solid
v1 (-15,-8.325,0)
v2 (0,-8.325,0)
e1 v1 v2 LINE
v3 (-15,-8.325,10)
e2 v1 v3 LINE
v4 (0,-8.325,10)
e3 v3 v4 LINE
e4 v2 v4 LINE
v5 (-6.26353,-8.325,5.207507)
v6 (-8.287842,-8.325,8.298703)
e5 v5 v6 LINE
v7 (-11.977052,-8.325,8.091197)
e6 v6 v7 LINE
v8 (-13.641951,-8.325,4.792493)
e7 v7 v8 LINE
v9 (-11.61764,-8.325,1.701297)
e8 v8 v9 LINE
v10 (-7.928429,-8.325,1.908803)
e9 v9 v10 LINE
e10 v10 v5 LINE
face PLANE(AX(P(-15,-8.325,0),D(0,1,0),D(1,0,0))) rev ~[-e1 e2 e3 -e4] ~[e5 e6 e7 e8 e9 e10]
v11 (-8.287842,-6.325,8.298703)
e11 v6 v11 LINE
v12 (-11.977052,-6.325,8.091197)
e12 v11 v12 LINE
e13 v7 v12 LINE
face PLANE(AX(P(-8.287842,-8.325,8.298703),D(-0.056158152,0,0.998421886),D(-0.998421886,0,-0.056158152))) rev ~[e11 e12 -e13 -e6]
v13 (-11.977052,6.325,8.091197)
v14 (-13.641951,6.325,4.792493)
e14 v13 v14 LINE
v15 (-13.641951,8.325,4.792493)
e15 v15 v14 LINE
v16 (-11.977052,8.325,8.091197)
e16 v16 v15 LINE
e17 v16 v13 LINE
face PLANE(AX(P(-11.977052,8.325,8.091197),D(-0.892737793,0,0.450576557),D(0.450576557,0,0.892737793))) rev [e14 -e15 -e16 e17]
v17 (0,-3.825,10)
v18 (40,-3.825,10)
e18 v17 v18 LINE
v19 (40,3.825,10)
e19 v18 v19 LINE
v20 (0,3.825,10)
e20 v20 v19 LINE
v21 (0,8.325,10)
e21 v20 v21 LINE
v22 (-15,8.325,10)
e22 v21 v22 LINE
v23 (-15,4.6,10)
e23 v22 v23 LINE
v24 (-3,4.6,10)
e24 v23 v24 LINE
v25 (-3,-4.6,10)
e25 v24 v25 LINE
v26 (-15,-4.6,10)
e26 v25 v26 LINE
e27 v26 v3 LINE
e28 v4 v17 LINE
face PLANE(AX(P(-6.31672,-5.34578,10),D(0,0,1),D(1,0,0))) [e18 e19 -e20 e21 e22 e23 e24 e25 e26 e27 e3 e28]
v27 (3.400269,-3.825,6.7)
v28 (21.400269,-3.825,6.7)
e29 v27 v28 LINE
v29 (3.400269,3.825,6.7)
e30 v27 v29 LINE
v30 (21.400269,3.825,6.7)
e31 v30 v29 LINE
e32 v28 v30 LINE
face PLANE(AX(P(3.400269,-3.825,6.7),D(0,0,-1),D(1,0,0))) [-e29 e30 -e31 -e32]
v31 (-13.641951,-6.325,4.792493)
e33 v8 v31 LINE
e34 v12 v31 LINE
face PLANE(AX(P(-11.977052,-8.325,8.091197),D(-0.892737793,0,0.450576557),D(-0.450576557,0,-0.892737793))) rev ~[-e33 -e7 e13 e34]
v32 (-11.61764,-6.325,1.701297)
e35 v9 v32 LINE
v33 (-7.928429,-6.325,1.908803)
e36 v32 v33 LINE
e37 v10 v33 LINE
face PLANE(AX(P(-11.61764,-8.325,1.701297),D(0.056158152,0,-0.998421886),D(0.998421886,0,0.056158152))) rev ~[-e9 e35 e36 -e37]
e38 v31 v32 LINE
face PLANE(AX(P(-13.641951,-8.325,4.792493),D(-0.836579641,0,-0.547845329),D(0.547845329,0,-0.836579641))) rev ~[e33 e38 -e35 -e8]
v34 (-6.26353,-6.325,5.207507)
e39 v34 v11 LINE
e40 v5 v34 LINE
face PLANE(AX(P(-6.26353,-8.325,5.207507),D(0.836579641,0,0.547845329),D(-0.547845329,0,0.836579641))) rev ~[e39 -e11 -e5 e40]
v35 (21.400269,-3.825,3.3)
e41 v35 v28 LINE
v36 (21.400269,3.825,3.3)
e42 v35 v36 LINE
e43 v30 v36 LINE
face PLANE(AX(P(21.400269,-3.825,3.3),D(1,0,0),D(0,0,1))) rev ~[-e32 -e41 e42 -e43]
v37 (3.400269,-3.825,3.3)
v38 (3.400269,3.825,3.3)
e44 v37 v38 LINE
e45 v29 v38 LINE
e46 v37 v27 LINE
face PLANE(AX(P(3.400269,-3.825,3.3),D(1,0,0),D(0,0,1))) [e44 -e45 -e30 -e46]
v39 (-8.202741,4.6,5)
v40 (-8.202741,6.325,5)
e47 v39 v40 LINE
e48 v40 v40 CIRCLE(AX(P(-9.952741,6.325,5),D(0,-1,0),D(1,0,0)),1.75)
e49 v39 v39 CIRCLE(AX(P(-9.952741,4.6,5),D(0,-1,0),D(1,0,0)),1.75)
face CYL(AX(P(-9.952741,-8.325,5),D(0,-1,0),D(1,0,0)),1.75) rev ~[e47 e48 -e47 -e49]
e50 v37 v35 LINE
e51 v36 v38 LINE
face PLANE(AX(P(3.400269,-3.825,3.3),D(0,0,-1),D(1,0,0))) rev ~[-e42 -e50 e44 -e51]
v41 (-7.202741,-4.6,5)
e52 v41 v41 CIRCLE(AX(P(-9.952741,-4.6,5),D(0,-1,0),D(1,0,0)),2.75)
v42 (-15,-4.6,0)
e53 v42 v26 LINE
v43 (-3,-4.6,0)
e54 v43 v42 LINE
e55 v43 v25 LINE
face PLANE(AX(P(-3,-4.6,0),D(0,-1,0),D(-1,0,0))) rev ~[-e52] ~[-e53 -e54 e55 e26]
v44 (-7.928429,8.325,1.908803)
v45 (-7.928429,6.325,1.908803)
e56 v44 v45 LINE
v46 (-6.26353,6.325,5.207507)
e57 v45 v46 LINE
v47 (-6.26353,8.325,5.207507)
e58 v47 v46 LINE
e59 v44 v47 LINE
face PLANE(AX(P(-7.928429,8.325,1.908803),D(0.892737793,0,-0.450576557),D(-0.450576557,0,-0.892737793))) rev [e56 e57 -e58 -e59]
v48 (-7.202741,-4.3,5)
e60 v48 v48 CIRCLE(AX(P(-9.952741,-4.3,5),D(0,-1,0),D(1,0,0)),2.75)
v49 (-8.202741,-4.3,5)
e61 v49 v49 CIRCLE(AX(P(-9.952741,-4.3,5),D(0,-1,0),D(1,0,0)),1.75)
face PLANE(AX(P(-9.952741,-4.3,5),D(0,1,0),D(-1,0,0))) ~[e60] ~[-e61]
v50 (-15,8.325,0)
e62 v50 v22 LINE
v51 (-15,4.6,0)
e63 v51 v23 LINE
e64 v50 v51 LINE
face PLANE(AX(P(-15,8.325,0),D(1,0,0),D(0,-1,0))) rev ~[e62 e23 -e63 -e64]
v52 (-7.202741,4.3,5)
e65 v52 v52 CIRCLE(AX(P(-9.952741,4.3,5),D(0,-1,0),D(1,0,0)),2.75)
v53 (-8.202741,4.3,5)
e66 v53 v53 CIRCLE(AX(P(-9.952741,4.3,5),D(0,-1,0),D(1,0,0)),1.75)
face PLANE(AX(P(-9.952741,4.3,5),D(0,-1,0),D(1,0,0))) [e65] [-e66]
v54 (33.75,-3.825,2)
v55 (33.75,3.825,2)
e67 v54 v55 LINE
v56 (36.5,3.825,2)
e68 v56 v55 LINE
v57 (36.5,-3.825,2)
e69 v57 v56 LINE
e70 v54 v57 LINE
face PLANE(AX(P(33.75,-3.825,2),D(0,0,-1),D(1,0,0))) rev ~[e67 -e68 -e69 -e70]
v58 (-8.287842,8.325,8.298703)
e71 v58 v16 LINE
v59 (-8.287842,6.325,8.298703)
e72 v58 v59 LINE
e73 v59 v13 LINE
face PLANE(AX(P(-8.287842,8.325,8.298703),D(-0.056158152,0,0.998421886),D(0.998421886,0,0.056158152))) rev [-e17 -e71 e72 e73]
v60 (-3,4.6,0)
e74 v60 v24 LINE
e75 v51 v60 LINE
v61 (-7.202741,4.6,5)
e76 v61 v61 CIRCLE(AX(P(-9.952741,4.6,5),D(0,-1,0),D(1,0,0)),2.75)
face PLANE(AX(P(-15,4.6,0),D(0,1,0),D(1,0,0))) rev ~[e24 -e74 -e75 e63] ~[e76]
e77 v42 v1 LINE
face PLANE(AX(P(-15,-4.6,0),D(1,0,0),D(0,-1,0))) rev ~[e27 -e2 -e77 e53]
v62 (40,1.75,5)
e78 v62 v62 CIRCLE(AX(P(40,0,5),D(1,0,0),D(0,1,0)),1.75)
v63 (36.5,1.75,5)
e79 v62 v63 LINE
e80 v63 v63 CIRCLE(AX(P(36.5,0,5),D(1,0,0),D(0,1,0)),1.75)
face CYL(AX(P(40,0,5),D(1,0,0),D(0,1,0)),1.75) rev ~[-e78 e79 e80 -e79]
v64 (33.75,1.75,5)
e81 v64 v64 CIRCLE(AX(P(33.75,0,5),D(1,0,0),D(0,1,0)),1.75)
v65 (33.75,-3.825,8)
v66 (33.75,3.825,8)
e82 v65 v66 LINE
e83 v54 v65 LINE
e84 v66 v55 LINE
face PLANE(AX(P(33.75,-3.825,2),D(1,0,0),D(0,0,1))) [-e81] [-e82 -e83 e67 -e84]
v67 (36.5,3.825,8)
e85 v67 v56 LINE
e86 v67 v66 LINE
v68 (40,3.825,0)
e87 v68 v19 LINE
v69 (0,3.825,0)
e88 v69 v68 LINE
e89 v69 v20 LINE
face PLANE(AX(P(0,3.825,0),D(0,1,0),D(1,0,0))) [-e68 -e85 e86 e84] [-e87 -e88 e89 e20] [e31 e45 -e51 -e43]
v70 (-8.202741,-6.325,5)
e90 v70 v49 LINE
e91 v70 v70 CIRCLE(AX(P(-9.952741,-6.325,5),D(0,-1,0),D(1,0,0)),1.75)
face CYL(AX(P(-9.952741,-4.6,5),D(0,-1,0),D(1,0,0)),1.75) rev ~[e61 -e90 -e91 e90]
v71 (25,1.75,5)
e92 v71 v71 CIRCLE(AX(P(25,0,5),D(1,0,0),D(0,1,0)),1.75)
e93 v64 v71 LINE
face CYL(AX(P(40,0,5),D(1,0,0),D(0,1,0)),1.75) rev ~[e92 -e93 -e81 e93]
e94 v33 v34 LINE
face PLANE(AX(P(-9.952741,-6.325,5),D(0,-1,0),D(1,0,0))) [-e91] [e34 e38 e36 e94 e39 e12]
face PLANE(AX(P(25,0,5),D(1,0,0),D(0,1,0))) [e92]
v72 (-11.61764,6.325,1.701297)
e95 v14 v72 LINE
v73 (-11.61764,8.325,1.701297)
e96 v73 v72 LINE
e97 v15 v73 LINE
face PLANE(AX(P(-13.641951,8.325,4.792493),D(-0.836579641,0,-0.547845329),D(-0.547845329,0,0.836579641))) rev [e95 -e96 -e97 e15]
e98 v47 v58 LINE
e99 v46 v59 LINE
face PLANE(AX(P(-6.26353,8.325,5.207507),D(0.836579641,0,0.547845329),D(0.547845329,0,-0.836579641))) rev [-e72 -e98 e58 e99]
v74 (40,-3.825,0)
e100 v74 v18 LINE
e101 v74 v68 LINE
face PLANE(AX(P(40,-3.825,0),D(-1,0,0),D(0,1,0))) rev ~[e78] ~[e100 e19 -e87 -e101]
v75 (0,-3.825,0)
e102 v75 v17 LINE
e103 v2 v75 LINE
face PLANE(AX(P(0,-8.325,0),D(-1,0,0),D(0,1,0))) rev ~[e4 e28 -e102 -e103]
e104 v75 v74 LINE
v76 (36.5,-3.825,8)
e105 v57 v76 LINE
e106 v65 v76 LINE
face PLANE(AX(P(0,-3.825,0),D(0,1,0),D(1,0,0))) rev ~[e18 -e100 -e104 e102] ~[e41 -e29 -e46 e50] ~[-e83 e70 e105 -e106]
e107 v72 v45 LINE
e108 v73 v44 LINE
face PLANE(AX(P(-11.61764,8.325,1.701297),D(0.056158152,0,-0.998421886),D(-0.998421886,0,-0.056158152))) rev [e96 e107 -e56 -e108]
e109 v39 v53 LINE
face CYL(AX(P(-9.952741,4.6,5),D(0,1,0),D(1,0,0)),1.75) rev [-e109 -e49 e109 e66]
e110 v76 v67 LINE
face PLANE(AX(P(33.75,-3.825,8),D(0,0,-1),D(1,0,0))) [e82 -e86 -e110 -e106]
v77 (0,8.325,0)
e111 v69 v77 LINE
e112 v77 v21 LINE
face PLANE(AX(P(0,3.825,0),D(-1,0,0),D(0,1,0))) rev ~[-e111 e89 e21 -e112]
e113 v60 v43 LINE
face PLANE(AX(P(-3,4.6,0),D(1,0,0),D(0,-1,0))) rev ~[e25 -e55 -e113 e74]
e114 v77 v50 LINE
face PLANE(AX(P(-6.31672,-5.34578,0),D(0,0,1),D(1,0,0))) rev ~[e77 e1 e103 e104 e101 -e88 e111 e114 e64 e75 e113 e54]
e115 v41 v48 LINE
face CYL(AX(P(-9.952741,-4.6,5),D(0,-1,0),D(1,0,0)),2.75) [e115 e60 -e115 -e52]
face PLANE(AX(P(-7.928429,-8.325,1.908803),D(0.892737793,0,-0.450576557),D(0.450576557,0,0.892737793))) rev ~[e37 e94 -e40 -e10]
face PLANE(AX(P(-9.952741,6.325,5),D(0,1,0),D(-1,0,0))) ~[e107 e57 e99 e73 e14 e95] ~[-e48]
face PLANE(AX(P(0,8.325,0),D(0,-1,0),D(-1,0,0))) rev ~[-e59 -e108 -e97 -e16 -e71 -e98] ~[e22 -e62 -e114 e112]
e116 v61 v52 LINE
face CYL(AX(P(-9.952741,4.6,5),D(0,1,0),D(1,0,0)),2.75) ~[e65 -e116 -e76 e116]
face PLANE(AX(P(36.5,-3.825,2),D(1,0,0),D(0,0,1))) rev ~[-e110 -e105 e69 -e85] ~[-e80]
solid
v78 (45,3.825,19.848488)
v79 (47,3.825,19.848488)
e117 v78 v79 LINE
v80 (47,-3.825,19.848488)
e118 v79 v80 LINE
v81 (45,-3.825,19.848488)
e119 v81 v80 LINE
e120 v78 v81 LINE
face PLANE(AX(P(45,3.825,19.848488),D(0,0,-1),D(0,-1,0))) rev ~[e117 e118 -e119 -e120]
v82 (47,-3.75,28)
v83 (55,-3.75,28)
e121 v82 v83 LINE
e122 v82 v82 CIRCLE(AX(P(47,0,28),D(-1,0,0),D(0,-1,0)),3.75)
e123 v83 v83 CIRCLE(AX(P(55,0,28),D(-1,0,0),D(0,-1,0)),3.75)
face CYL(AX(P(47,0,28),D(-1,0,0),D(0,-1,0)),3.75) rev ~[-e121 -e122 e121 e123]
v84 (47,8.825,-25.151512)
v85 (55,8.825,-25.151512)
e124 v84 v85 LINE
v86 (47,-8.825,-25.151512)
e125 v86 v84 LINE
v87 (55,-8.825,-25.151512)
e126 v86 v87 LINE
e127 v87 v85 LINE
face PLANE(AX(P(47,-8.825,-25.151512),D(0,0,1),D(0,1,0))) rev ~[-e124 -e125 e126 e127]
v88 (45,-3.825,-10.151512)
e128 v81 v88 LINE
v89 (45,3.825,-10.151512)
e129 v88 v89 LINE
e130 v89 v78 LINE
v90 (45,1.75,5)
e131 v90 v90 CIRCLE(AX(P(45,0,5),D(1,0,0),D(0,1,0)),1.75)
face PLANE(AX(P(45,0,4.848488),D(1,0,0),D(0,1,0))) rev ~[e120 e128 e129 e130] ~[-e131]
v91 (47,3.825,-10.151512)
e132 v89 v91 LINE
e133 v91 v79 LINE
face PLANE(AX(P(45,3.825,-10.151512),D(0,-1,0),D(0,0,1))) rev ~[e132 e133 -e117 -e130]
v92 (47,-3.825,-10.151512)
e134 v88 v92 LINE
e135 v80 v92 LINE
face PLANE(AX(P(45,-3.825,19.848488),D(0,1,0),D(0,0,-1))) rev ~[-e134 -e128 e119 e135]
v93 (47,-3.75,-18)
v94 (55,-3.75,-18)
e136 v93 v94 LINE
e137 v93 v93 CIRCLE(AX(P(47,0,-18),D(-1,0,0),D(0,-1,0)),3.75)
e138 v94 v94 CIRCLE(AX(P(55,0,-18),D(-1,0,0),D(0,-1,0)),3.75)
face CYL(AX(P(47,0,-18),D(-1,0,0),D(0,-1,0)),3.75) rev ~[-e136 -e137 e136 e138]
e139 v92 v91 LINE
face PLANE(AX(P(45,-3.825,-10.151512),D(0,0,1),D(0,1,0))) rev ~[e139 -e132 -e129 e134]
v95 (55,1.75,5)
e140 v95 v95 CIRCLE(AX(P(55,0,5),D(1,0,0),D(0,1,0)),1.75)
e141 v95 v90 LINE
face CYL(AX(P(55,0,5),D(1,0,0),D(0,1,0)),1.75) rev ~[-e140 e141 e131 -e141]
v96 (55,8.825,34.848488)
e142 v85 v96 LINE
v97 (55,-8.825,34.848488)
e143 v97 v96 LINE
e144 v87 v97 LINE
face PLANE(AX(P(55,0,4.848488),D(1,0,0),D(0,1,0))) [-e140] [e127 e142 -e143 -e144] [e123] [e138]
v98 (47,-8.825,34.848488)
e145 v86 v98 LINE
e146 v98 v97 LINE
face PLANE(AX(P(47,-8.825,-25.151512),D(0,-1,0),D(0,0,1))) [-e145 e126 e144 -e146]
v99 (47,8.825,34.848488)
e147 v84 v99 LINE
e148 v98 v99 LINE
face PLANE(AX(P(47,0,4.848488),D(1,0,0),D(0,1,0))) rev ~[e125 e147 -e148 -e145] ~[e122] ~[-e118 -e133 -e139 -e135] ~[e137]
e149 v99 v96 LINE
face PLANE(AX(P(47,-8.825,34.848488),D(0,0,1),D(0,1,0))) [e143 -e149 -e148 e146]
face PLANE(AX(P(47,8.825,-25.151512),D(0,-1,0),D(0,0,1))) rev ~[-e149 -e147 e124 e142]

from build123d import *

# Parameters (mm, degrees)
F0_W      = 40
F0_H      = 3.825
F1_DEPTH  = 10
F2_R      = 1.75
F3_DEPTH  = 16.651
F4_W      = 18
F4_H      = 3.4
F4_W_2    = 2.75
F4_H_2    = 6
F5_DEPTH  = 12.151
F6_R      = 1.75
F7_DEPTH  = 15
F10_DEPTH = 2
F11_W     = 17.65
F11_H     = 60
F12_DEPTH = 8
F13_R     = 1.75
F14_DEPTH = 70.001
F15_R     = 2.75
F15_R_2   = 1.75
F16_DEPTH = 0.3
F17_R     = 1.75
F18_DEPTH = 2
F19_R     = 3.75
F20_DEPTH = 15


# Not quite as in the source:
# - a pattern or mirror of a feature is missing from the dataset's text; its kind, count and spacing are read off the source's solid


with BuildPart() as f1:
    # F0 (on Top) → F1 (new body)
    with BuildSketch(Plane.XY):
        Polygon((0, -3.825), (0, 0), (-3, 0), (-3, -4.6), (-15, -4.6), (-15, -8.325), (0, -8.325), align=None)
        Polygon((-3, 0), (0, 0), (0, 3.825), (0, 8.325), (-15, 8.325), (-15, 4.6), (-3, 4.6), align=None)
        with Locations((20, 1.9125)):
            Rectangle(F0_W, F0_H)
        with Locations((20, -1.9125)):
            Rectangle(F0_W, F0_H)
    extrude(amount=F1_DEPTH)

    # F2 (on face) → F3 (cut, through all)
    with BuildSketch(Plane.XZ.offset(8.325)):
        with Locations((-9.9527407438, 5)):
            Circle(F2_R)
    extrude(amount=-F3_DEPTH, mode=Mode.SUBTRACT)

    # F4 (on face) → F5 (cut, through all)
    with BuildSketch(Plane.XZ.offset(3.825)):
        with Locations((12.4002694301, 5)):
            Rectangle(F4_W, F4_H)
        with Locations((35.125, 5)):
            Rectangle(F4_W_2, F4_H_2)
    extrude(amount=-F5_DEPTH, mode=Mode.SUBTRACT)

    # F6 (on face) → F7 (cut)
    with BuildSketch(Plane.YZ.offset(40)):
        with Locations((0, 5)):
            Circle(F6_R)
    extrude(amount=-F7_DEPTH, mode=Mode.SUBTRACT)

    # F15 (on face) → F16 (join)
    with BuildSketch(Plane.XZ.offset(-4.6)):
        with Locations((-9.9527407438, 5)):
            Circle(F15_R)
        with Locations((-9.9527407438, 5)):
            Circle(F15_R_2, mode=Mode.SUBTRACT)
    f16 = extrude(amount=F16_DEPTH)

    # F16_copies: F16 across plane
    add(f16.mirror(Plane(origin=(0, 0, 0), x_dir=(0, 0, -1), z_dir=(0, -1, 0))))

    # F17 (on face) → F18 (cut)
    with BuildSketch(Plane.XZ.offset(8.325)):
        Polygon((-7.9284293953, 1.9088033227), (-6.2635302189, 5.2075067143), (-8.2878415673, 8.2987033916), (-11.9770520922, 8.0911966773), (-13.6419512686, 4.7924932857), (-11.6176399202, 1.7012966084), align=None)
        with Locations((-9.9527407438, 5)):
            Circle(F17_R, mode=Mode.SUBTRACT)
    f18 = extrude(amount=-F18_DEPTH, mode=Mode.SUBTRACT)

    # F18_copies: F18 across plane
    add(f18.mirror(Plane.ZX), mode=Mode.SUBTRACT)


with BuildPart() as f10:
    # F9 (on offset) → F10 (new body)
    with BuildSketch(Plane.YZ.offset(45)):
        Polygon((3.825, 0), (3.825, 10), (3.825, 19.8484882712), (-3.825, 19.8484882712), (-3.825, 10), (-3.825, 0), (-3.825, -10.1515117288), (3.825, -10.1515117288), align=None)
    extrude(amount=F10_DEPTH)

    # F11 (on face) → F12 (join)
    with BuildSketch(Plane.YZ.offset(47)):
        with Locations((0, 4.8484882712)):
            Rectangle(F11_W, F11_H)
    extrude(amount=F12_DEPTH)

    # F13 (on face) → F14 (cut, through all)
    with BuildSketch(Plane.YZ.offset(55)):
        with Locations((0, 5)):
            Circle(F13_R)
    extrude(amount=-F14_DEPTH, mode=Mode.SUBTRACT)

    # F19 (on face) → F20 (cut)
    with BuildSketch(Plane(origin=(47, 0, 0), x_dir=(0, -1, 0), z_dir=(-1, 0, 0))):
        with Locations((0, 28)):
            Circle(F19_R)
        with Locations((0, -18)):
            Circle(F19_R)
    extrude(amount=-F20_DEPTH, mode=Mode.SUBTRACT)


solid = Compound([f1.part, f10.part])
